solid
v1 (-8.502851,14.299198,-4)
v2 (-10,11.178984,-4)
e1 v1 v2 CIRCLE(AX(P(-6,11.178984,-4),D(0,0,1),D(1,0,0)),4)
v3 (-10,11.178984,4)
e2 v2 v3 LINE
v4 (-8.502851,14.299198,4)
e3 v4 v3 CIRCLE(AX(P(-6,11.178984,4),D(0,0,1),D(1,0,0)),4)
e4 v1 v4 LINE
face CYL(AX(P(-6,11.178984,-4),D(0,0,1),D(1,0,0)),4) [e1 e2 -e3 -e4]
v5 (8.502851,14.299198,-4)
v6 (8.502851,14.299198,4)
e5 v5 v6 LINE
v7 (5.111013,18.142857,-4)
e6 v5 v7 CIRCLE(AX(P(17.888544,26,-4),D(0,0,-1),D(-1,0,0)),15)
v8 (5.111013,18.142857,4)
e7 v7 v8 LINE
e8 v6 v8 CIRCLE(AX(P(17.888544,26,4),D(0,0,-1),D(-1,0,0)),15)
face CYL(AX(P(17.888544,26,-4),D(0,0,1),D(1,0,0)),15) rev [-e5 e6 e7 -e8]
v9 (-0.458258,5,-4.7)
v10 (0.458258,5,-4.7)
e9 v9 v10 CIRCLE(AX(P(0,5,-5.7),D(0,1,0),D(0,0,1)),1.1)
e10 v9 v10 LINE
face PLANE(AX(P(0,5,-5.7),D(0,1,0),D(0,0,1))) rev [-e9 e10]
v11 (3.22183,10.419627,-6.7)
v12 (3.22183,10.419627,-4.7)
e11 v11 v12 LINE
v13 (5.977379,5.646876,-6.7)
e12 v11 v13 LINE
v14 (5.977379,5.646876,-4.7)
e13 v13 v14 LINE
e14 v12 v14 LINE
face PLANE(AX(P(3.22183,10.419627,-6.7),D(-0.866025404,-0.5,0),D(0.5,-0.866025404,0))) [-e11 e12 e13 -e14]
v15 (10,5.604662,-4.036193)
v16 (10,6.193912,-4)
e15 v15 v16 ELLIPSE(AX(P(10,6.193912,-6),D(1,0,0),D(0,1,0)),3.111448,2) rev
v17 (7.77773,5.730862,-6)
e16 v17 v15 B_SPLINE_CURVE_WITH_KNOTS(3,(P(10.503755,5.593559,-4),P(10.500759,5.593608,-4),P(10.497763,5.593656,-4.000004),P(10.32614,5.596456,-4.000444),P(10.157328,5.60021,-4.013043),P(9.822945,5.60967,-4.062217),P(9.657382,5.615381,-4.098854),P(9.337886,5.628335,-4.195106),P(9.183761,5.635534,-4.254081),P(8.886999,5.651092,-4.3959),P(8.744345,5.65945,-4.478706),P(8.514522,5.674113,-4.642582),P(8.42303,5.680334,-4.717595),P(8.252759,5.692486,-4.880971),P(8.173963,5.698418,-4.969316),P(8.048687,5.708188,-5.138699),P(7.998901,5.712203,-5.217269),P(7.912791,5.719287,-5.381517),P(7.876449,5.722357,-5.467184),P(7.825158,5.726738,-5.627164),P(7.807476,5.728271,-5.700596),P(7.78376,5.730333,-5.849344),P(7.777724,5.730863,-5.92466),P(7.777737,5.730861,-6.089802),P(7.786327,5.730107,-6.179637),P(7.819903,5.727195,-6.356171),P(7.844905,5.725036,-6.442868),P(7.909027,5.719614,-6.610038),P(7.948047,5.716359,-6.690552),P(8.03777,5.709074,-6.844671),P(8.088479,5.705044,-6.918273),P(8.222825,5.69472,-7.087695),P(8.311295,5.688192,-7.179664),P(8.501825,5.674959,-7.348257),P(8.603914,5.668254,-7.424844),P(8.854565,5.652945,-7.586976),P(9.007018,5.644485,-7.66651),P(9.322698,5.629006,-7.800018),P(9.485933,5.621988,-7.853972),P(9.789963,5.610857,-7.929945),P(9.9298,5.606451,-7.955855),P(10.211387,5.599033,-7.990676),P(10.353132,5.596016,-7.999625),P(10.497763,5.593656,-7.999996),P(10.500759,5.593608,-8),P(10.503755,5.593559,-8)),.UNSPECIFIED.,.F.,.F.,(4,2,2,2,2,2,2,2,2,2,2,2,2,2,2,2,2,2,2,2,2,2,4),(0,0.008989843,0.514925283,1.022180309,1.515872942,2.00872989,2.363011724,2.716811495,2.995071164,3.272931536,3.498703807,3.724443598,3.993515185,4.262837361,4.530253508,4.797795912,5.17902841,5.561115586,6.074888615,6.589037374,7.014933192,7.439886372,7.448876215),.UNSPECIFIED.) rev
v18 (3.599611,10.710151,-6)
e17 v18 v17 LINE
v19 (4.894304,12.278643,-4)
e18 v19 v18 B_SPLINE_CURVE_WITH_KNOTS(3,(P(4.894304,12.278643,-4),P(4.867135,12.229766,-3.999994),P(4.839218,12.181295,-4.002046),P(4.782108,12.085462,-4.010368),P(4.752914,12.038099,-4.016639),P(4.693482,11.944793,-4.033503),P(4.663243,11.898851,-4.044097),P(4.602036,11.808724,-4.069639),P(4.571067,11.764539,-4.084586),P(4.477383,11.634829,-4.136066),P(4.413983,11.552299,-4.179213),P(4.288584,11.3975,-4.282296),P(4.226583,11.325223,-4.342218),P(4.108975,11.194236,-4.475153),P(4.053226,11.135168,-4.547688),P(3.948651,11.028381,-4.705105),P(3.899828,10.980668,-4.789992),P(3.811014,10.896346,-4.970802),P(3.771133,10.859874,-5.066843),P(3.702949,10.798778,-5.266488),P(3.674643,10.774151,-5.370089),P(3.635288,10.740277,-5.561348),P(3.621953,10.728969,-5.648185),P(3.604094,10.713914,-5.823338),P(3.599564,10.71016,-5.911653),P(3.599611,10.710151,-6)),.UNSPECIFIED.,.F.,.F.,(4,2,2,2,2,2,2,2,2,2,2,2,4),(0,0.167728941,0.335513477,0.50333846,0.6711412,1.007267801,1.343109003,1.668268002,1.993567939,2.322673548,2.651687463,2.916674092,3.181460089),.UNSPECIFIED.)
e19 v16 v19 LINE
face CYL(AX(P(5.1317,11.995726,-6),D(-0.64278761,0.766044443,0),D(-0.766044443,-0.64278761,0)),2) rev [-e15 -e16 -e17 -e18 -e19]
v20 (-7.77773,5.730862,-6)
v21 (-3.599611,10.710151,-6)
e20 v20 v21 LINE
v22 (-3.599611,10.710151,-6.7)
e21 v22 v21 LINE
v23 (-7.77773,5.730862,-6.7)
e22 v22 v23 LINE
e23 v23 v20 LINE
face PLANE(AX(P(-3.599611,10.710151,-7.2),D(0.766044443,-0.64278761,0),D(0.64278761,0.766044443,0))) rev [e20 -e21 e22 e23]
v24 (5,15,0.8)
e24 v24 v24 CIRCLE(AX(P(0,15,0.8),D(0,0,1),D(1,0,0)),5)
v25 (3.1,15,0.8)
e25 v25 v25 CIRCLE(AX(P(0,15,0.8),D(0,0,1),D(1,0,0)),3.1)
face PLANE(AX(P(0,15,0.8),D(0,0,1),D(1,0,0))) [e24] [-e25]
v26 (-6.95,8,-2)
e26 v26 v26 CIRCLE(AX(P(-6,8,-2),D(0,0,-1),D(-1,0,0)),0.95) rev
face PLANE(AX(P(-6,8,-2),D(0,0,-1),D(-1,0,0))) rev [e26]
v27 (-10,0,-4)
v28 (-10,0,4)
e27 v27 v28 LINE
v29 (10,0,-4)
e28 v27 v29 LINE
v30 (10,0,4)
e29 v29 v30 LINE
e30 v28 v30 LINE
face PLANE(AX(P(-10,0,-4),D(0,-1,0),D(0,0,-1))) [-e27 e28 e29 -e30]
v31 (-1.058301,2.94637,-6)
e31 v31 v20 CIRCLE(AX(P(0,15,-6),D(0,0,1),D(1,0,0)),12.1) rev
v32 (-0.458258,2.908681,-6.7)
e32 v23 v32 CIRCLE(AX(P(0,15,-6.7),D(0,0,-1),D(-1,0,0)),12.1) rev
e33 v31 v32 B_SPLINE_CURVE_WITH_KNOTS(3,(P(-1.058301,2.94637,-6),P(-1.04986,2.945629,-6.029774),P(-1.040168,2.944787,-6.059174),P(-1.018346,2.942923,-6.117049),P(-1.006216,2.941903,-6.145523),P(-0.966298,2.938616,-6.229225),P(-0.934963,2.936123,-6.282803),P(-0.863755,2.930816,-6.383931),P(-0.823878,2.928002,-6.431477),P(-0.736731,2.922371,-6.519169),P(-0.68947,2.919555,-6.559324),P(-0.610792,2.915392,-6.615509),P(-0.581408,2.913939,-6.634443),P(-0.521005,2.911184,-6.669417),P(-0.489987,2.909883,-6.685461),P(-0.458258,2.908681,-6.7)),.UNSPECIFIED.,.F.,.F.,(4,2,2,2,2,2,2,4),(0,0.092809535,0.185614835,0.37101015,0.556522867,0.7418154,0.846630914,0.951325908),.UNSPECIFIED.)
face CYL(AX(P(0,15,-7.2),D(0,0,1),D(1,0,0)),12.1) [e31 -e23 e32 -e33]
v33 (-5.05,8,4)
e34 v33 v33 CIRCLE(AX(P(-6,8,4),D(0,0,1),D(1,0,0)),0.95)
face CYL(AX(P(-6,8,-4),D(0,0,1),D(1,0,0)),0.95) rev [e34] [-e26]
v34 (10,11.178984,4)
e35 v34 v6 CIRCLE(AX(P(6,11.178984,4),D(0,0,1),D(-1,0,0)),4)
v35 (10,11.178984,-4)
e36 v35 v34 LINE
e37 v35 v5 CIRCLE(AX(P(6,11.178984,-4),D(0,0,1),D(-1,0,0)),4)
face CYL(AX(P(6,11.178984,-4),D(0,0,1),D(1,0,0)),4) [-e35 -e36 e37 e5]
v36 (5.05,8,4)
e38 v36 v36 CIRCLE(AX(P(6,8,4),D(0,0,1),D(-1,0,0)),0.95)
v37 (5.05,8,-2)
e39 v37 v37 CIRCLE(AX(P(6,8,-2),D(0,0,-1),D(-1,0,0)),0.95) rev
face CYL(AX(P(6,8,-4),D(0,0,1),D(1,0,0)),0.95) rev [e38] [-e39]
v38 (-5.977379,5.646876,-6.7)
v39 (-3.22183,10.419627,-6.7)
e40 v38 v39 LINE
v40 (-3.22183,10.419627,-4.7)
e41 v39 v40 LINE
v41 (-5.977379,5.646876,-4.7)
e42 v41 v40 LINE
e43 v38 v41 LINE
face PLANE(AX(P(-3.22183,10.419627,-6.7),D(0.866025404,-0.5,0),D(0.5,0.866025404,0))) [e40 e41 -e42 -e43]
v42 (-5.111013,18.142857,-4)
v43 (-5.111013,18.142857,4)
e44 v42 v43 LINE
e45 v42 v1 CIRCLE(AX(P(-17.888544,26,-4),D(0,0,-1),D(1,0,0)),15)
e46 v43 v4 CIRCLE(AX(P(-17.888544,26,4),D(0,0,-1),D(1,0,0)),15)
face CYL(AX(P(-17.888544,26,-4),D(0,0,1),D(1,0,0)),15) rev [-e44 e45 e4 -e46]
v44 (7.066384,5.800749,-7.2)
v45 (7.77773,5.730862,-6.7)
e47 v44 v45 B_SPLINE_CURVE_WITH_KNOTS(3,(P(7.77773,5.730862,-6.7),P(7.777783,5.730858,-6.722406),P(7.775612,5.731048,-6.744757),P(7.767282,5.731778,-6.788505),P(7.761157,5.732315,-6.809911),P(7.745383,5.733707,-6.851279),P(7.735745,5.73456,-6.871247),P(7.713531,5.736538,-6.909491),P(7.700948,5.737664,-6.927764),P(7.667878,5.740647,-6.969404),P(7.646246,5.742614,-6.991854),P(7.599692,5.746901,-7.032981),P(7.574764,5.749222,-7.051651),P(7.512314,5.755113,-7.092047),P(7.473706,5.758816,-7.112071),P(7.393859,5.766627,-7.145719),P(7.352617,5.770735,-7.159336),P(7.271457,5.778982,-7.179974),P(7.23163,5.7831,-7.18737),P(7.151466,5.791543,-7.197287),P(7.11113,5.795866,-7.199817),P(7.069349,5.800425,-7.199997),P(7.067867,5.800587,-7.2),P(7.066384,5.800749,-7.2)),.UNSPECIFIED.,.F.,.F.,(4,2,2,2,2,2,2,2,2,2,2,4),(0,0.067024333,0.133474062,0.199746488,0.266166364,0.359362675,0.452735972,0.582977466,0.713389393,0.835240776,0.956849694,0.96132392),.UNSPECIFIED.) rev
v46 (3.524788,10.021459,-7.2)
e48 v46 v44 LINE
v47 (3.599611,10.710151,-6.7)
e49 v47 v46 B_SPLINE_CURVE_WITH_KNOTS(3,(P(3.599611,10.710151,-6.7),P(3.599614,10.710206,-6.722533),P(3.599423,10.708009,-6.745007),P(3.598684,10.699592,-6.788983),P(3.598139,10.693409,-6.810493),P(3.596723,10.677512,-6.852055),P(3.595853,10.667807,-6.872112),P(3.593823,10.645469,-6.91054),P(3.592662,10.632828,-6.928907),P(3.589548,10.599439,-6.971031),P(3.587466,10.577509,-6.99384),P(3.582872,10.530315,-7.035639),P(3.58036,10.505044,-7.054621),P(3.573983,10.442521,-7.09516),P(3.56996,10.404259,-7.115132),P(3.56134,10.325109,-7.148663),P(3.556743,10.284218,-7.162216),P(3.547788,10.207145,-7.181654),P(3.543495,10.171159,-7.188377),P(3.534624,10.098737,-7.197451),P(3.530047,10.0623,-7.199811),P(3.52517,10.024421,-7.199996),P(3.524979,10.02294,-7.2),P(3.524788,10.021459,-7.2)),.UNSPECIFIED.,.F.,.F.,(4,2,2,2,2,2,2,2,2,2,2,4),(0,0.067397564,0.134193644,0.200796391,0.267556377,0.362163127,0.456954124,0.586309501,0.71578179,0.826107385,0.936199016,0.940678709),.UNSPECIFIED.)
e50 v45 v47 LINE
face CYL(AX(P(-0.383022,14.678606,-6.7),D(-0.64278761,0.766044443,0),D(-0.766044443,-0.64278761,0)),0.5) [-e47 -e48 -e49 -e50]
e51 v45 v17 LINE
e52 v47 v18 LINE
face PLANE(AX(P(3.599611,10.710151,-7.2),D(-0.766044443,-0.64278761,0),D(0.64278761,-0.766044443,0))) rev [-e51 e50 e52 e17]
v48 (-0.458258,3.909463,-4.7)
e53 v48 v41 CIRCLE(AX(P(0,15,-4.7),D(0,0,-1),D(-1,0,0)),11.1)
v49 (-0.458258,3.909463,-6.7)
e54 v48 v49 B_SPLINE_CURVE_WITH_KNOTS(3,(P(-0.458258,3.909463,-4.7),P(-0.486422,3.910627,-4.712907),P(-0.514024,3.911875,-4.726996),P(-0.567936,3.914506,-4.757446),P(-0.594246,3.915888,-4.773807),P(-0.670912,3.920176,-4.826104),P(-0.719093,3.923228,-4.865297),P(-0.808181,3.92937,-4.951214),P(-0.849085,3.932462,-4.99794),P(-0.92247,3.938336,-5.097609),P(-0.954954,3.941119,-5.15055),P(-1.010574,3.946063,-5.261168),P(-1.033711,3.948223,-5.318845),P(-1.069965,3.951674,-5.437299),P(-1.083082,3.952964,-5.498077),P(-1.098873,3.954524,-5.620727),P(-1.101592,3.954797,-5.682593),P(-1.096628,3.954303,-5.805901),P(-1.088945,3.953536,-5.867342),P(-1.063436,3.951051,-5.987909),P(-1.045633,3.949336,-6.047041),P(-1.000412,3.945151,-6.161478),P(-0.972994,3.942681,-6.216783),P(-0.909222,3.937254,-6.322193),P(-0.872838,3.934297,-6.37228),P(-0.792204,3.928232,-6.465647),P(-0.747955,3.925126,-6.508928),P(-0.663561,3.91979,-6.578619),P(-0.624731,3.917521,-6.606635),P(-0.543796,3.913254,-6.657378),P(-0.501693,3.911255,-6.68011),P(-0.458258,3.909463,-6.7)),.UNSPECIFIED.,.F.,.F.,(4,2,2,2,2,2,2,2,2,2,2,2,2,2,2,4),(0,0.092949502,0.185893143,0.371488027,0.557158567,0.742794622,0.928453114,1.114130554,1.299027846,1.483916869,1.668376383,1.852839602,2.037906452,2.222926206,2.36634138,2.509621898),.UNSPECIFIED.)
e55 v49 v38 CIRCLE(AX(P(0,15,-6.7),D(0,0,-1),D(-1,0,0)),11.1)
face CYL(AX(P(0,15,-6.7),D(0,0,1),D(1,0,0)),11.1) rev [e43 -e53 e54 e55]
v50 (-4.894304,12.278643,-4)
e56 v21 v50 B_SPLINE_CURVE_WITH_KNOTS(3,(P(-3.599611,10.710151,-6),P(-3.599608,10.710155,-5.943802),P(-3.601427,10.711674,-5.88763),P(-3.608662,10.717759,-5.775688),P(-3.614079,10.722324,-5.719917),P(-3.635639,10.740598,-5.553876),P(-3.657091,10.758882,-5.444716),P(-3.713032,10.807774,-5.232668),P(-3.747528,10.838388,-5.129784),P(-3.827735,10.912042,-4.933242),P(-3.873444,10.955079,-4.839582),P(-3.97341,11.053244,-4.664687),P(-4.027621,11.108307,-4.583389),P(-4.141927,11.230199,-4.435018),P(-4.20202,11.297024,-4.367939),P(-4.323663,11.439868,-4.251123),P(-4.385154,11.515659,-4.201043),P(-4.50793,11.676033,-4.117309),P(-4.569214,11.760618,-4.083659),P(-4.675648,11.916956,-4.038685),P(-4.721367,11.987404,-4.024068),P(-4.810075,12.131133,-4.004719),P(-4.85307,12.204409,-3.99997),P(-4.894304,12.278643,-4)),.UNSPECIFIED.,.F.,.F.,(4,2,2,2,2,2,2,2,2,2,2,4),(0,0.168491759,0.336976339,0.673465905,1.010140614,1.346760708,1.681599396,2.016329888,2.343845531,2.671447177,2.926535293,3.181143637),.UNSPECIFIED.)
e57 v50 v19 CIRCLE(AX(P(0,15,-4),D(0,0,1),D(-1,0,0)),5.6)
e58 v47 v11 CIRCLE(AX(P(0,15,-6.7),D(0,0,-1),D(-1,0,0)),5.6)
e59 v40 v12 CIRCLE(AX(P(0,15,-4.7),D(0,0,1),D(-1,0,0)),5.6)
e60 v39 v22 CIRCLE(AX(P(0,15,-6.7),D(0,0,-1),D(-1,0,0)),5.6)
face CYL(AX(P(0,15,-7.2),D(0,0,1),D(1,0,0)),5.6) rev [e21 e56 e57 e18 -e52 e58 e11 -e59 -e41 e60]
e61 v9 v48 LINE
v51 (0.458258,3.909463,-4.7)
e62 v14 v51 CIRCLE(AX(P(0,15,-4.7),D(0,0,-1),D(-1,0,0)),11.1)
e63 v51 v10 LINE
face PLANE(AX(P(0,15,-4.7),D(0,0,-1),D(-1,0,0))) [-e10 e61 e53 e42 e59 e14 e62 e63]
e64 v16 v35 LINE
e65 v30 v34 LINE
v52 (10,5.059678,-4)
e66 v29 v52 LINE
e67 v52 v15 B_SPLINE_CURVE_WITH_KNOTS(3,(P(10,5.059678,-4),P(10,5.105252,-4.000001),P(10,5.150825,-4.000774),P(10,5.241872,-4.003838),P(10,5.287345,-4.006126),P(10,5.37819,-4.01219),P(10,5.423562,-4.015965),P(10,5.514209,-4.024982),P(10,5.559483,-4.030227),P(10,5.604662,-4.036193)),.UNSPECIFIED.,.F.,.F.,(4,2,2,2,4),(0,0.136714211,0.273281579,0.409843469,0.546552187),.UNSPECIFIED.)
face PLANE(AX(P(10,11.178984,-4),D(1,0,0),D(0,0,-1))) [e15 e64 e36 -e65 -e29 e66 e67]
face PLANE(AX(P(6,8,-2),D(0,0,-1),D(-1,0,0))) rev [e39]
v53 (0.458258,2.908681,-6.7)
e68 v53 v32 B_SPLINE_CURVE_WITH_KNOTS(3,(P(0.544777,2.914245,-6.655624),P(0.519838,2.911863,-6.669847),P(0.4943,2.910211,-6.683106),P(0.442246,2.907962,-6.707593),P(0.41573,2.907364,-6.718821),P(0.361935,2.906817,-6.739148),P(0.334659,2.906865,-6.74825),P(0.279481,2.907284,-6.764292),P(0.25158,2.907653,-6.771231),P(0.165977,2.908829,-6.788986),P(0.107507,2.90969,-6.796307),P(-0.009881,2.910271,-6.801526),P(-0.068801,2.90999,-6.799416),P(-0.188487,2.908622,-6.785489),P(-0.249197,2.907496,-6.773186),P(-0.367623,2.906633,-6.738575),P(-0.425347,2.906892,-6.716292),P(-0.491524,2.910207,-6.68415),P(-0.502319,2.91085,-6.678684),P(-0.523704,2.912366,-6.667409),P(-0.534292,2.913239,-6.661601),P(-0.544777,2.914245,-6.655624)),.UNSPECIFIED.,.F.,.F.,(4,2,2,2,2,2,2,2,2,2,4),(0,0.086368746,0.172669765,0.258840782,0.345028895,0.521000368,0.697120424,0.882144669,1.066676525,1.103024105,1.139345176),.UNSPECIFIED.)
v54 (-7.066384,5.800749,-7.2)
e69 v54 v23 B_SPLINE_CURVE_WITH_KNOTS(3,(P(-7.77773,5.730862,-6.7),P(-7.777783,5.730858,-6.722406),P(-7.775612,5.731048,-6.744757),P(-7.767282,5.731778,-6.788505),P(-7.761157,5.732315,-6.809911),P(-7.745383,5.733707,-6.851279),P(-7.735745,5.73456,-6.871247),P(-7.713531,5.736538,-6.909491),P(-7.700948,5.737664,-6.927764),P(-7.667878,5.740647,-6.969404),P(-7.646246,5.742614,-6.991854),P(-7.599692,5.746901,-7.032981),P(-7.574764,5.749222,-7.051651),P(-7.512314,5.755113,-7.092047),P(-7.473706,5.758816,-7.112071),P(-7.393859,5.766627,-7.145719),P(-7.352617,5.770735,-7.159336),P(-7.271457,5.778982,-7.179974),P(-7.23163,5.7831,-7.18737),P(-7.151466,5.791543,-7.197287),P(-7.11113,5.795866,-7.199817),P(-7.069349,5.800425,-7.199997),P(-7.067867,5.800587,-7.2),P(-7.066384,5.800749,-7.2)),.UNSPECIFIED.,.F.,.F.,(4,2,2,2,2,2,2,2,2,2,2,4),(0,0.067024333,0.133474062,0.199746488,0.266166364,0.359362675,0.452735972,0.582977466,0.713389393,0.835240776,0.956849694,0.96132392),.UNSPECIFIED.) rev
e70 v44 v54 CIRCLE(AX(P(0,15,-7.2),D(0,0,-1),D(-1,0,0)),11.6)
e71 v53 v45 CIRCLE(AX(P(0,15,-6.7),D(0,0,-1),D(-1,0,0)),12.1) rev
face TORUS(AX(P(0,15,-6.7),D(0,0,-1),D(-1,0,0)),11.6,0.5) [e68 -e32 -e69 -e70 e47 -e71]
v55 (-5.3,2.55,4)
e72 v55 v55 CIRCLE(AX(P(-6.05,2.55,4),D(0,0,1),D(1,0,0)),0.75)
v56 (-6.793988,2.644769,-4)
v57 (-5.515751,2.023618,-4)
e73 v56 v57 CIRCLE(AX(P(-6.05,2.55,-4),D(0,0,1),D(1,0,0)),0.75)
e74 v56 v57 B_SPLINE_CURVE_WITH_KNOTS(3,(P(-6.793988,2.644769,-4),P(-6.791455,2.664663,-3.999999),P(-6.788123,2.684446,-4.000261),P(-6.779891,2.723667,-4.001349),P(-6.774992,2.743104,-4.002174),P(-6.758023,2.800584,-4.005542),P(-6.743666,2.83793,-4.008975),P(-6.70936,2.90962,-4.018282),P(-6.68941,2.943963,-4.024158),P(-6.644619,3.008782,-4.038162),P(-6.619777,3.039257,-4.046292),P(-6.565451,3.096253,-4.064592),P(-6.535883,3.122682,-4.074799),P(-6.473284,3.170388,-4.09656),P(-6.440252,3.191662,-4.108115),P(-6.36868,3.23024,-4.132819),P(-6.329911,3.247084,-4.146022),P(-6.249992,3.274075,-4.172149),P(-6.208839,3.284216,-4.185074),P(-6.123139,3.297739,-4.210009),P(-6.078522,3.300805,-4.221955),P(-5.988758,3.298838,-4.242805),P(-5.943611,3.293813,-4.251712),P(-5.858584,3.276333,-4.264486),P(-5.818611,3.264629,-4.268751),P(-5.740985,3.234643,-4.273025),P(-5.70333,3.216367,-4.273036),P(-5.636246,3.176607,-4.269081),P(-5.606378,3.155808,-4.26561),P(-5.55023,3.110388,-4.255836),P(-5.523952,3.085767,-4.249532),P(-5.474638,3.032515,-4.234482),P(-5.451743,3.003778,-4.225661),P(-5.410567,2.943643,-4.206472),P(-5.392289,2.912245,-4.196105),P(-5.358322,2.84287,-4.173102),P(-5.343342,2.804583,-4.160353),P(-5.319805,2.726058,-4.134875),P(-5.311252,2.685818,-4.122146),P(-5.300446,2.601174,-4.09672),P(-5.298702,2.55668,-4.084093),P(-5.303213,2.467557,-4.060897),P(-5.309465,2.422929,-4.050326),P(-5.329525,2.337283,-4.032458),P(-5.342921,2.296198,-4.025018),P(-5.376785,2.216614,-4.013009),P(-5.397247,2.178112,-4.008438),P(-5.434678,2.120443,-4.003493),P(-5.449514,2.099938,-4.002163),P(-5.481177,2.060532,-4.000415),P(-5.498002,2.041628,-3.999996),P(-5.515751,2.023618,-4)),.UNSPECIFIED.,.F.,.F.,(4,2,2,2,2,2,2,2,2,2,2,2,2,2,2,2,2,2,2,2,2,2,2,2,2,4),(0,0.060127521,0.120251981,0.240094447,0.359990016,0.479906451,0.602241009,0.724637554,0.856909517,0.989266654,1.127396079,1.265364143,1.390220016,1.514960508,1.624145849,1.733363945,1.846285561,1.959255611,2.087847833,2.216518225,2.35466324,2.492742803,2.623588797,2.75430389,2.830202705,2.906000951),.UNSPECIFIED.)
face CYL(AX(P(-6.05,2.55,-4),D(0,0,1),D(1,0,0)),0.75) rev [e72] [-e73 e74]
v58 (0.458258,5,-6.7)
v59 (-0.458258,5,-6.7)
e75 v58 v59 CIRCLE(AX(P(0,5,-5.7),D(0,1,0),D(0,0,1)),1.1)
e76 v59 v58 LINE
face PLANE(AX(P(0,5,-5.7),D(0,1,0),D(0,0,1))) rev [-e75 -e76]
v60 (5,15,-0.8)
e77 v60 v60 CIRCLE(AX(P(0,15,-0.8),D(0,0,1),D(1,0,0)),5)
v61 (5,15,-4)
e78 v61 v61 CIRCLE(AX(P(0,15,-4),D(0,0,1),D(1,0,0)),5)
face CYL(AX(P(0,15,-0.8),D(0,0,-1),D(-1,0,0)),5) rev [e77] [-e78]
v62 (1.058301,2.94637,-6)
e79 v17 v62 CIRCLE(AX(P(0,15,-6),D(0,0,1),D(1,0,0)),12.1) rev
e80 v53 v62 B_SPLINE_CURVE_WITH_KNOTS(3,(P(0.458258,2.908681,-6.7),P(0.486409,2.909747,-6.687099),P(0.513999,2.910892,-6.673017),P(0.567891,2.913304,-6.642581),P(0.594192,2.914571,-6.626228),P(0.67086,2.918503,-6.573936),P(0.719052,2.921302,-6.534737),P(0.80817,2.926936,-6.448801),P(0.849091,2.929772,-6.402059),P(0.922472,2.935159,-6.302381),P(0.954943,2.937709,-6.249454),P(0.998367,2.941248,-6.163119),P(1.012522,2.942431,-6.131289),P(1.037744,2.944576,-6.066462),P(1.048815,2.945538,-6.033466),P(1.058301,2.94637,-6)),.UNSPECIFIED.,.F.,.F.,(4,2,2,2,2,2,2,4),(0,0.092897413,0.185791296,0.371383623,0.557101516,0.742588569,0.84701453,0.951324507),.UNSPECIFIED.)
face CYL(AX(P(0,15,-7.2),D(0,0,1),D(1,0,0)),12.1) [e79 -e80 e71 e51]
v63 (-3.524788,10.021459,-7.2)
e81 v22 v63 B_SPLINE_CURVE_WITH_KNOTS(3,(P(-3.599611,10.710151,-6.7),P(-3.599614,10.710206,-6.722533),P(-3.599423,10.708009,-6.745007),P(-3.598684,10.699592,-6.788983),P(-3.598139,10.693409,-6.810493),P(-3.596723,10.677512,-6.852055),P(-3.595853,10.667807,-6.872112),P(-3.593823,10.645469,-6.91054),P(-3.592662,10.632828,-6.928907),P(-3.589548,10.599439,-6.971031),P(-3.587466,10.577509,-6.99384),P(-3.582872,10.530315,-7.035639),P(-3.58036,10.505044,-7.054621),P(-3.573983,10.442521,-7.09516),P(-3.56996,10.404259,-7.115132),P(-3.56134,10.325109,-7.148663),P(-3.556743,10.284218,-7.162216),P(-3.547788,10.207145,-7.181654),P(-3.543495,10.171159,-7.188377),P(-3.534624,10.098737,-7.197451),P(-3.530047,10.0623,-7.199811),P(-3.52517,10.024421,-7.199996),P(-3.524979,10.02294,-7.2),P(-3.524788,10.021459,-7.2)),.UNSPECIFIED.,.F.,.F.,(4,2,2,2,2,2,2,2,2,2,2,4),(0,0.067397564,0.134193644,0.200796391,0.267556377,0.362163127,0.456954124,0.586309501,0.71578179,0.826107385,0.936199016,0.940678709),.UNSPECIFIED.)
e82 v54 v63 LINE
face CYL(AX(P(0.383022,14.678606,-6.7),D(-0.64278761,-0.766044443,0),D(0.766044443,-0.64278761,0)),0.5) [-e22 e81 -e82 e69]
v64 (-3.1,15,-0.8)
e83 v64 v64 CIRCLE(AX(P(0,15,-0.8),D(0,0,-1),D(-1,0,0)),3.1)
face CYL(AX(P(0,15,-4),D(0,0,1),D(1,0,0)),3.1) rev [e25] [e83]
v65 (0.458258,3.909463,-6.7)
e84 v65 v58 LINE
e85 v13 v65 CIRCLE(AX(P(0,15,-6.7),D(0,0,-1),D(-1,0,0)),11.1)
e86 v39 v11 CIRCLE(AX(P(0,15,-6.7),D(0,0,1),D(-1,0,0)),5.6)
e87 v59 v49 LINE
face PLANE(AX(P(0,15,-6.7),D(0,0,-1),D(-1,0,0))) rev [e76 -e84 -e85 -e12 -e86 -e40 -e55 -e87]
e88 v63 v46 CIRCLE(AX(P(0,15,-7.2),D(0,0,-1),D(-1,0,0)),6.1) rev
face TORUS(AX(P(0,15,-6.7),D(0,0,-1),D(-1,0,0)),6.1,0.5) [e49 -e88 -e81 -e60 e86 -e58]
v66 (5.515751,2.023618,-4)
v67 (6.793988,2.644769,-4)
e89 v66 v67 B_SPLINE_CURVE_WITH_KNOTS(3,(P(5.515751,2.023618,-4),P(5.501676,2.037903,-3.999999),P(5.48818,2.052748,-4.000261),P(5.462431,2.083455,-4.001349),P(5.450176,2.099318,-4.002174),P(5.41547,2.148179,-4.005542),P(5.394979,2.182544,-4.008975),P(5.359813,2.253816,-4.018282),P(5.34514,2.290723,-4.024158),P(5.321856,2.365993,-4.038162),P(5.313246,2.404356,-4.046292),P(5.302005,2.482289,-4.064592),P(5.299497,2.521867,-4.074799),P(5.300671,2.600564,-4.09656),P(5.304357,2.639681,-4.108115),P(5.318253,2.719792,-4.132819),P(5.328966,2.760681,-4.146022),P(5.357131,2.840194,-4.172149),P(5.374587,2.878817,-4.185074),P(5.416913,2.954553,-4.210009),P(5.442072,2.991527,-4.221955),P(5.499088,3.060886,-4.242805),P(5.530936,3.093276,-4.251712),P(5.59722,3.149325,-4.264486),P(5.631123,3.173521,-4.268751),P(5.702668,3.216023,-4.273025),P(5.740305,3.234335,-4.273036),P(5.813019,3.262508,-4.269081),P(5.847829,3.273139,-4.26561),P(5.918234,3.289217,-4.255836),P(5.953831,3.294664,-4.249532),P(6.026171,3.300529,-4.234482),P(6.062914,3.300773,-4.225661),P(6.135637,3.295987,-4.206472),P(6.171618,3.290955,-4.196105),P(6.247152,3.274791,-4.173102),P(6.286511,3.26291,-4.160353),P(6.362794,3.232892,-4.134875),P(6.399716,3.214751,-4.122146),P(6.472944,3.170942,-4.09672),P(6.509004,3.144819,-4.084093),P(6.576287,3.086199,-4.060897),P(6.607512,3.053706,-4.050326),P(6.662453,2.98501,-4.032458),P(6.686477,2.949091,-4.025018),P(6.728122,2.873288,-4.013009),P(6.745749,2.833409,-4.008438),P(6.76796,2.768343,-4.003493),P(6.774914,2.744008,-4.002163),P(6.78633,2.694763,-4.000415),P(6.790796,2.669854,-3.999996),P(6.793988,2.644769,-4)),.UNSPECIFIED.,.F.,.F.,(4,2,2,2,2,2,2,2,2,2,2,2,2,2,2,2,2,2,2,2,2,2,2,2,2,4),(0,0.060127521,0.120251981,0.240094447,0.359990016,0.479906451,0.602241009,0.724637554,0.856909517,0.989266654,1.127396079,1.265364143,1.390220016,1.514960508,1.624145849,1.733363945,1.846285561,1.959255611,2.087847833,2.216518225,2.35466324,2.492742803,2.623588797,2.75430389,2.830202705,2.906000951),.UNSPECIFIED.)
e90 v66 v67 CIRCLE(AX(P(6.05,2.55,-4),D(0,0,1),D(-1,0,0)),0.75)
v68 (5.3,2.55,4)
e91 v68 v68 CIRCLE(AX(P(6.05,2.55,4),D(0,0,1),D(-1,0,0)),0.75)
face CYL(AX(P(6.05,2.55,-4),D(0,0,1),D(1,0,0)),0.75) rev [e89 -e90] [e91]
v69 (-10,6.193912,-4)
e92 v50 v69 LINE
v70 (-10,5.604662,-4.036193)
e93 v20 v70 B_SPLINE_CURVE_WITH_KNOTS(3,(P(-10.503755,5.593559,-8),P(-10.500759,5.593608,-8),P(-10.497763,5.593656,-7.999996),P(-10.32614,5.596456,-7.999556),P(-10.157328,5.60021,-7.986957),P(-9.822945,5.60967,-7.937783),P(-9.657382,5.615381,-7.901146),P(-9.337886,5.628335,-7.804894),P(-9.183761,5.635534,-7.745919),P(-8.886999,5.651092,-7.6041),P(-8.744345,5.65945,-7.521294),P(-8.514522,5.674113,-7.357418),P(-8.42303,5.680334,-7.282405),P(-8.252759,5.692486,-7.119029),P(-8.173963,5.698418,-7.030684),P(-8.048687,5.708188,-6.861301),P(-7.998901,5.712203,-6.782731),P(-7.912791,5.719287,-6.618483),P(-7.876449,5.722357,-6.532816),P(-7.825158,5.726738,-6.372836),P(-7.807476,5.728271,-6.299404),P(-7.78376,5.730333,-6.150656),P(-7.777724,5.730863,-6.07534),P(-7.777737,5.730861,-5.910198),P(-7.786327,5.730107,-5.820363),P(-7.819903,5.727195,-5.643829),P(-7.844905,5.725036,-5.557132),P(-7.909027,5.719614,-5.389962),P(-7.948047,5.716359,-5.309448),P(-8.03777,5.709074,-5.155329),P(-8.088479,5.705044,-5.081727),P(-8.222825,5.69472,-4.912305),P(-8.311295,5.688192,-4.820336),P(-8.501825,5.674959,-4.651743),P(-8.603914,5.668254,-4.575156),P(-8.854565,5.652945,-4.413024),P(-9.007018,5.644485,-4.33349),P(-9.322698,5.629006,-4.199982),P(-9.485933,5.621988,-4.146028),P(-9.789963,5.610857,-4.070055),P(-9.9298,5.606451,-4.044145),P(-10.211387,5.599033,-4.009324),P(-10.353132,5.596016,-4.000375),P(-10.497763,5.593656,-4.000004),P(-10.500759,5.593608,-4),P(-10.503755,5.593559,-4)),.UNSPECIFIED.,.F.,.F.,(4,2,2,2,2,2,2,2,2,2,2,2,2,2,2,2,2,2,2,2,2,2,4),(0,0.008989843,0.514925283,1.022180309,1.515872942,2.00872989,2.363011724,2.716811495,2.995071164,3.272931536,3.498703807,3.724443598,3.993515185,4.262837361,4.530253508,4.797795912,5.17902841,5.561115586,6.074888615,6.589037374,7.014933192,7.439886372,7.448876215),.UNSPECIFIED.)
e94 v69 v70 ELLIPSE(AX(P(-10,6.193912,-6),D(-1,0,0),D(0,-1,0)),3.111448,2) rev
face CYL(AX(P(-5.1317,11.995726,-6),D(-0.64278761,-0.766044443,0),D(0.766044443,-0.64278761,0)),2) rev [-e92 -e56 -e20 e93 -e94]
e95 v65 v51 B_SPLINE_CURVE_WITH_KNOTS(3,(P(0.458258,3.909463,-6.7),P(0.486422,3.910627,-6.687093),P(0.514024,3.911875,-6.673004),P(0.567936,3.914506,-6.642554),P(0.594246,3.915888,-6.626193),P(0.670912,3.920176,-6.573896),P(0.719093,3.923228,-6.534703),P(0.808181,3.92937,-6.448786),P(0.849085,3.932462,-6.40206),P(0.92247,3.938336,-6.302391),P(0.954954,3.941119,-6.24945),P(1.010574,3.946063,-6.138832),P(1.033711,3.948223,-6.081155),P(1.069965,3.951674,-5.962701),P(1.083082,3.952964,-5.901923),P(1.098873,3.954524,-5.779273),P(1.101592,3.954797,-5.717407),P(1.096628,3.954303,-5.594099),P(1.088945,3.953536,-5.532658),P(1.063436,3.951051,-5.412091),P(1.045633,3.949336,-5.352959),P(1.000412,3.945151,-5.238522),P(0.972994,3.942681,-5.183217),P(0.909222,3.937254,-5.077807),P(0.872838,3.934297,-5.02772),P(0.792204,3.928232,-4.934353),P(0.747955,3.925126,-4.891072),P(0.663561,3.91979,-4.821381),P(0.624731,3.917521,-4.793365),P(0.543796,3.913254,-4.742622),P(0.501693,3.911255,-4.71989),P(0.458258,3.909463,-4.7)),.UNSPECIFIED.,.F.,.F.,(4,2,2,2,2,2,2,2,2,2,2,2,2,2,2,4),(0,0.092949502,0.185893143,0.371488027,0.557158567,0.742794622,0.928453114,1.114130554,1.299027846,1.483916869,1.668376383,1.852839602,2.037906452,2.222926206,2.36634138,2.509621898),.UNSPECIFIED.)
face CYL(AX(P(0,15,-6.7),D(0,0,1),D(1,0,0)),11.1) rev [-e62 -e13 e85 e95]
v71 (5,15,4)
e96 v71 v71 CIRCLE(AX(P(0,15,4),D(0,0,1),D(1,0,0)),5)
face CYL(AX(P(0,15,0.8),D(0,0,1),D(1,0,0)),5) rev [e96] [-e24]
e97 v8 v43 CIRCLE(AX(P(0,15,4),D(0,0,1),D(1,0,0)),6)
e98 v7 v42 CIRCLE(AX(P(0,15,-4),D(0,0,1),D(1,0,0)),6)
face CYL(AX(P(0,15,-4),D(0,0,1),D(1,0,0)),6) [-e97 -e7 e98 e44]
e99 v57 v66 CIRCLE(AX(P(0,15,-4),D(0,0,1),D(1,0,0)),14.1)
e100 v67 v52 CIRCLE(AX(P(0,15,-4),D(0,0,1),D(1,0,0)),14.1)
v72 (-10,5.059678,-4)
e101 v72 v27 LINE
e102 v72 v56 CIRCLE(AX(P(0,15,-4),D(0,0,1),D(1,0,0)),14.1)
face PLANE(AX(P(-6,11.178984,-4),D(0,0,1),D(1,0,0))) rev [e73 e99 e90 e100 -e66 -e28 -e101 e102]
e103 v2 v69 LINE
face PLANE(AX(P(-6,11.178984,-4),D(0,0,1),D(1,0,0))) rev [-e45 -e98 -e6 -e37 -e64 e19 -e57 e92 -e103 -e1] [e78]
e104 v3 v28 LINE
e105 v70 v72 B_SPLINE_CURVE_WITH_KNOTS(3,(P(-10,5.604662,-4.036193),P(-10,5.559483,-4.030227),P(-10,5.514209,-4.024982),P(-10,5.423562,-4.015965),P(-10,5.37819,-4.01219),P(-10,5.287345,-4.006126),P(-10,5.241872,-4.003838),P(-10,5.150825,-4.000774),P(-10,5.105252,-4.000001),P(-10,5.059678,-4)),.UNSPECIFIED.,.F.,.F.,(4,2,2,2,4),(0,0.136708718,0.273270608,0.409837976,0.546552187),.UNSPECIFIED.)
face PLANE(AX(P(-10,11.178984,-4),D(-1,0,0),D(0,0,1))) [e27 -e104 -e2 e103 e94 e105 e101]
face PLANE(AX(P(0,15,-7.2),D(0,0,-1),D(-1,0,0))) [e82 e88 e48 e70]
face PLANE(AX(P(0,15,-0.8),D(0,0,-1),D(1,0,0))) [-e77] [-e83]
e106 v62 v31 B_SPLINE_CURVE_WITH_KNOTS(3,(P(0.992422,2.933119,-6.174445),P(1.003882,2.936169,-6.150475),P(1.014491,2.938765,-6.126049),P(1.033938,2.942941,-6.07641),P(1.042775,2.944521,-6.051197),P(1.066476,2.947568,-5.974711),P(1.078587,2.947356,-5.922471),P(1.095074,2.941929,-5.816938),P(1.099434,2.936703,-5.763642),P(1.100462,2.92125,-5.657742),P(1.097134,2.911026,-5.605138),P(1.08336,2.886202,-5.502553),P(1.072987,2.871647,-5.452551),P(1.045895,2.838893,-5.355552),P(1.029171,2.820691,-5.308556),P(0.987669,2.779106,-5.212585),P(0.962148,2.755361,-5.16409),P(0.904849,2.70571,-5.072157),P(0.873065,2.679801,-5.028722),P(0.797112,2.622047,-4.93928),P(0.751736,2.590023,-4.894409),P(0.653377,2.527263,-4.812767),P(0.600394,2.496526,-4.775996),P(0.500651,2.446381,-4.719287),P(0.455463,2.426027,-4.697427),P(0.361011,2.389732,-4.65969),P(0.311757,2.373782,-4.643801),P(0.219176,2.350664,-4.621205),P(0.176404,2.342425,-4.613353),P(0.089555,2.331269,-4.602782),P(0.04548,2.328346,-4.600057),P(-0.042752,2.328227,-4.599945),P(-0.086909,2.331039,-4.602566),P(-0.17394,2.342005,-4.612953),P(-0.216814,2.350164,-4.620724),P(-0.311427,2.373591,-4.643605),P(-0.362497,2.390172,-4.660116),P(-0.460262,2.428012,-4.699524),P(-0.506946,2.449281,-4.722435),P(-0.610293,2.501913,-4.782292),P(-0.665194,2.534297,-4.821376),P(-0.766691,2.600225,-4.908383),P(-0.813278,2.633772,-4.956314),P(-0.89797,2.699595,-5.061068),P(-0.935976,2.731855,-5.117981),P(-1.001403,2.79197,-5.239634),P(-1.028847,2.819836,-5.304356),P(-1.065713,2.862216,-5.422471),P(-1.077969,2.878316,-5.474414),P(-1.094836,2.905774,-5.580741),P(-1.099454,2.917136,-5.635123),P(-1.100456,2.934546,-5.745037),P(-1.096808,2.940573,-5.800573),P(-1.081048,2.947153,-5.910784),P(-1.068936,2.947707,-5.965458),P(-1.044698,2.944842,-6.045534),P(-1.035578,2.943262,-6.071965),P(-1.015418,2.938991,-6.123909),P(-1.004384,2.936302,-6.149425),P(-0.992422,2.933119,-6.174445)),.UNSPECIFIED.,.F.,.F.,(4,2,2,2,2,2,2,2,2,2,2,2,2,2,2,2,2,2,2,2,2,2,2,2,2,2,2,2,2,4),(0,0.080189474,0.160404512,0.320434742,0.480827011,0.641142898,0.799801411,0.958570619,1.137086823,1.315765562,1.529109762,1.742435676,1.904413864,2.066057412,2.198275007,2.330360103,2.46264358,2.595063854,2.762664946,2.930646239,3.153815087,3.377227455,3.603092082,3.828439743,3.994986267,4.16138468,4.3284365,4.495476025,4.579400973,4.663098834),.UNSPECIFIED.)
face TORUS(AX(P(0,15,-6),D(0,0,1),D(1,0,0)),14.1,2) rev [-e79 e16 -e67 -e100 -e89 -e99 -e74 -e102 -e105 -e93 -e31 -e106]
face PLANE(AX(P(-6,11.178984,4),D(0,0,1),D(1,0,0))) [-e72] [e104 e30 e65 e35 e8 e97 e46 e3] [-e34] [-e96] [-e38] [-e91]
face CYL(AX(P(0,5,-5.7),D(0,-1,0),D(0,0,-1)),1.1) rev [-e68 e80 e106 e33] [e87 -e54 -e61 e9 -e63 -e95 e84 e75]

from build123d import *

# Parameters (mm, degrees)
EXTRUDE_1_DEPTH          = 4
EXTRUDE_1_DEPTH_BACK     = 4
SKETCH_2_R               = 0.95
SKETCH_2_R_2             = 0.75
SKETCH_3_R               = 5
CUT_EXTRUDE_1_DEPTH      = 3.2
SKETCH_6_R               = 3.1
CUT_EXTRUDE_2_DEPTH      = 24.749526311
EXTRUDE_3_DEPTH          = 3.2
CUT_EXTRUDE_3_DEPTH      = 1.2
CUT_EXTRUDE_3_DEPTH_BACK = 0.8
SKETCH_10_R              = 0.95
EXTRUDE_4_DEPTH          = 2
FILLET_4_R               = 2
FILLET_START             = -7
FILLET_5_2_DEPTH         = 9
FILLET_START_2           = -2
FILLET_5_3_DEPTH         = 9
SKETCH_11_R              = 1.1
CUT_EXTRUDE_4_DEPTH      = 5


with BuildPart() as part:
    # 草图2 → 凸台-拉伸1 (new, two sides: drawn at the far end of the back side and taken through both)
    with BuildSketch(Plane.XY.offset(-EXTRUDE_1_DEPTH_BACK)):
        with BuildLine():
            Line((-10, 11.178983643), (-10, 0))
            Line((-10, 0), (10, 0))
            Line((10, 0), (10, 11.178983643))
            ThreePointArc((10, 11.178983643), (9.606342006, 12.909387452), (8.502851331, 14.299197613))
            ThreePointArc((8.502851331, 14.299197613), (6.641519688, 16.075059286), (5.11101252, 18.142857143))
            ThreePointArc((5.11101252, 18.142857143), (0, 21), (-5.11101252, 18.142857143))
            ThreePointArc((-5.11101252, 18.142857143), (-6.641519688, 16.075059286), (-8.502851331, 14.299197613))
            ThreePointArc((-8.502851331, 14.299197613), (-9.606342006, 12.909387452), (-10, 11.178983643))
        make_face()
        with Locations((-6, 8)):
            Circle(SKETCH_2_R, mode=Mode.SUBTRACT)
        with Locations((-6.05, 2.55)):
            Circle(SKETCH_2_R_2, mode=Mode.SUBTRACT)
        with Locations(Location((6.05, 2.55, 0), (0, 0, 180))):
            Circle(SKETCH_2_R_2, mode=Mode.SUBTRACT)
        with Locations(Location((6, 8, 0), (0, 0, 180))):
            Circle(SKETCH_2_R, mode=Mode.SUBTRACT)
    extrude(amount=EXTRUDE_1_DEPTH + EXTRUDE_1_DEPTH_BACK)

    # 草图3 → 切除-拉伸1 (cut)
    with BuildSketch(Plane.XY.offset(4)):
        with Locations((0, 15)):
            Circle(SKETCH_3_R)
    cut_extrude_1 = extrude(amount=-CUT_EXTRUDE_1_DEPTH, mode=Mode.SUBTRACT)

    # 镜向1: 切除-拉伸1 across plane
    add(cut_extrude_1.mirror(Plane.XY), mode=Mode.SUBTRACT)

    # 草图6 → 切除-拉伸2 (cut, through all)
    with BuildSketch(Plane.XY.offset(0.8)):
        with Locations((0, 15)):
            Circle(SKETCH_6_R)
    extrude(amount=-CUT_EXTRUDE_2_DEPTH, mode=Mode.SUBTRACT)

    # 草图8 → 凸台-拉伸3 (add)
    with BuildSketch(Plane(origin=(0, 0, -4), x_dir=(-1, 0, 0), z_dir=(0, 0, -1))):
        with BuildLine():
            Line((-3.599610614, 10.710151119), (-7.777730077, 5.730862238))
            ThreePointArc((-7.777730077, 5.730862238), (0, 2.9), (7.777730077, 5.730862238))
            Line((7.777730077, 5.730862238), (3.599610614, 10.710151119))
            ThreePointArc((3.599610614, 10.710151119), (0, 9.4), (-3.599610614, 10.710151119))
        make_face()
    extrude(amount=EXTRUDE_3_DEPTH)

    # 草图9 → 切除-拉伸3 (cut, two sides: drawn at the far end of the back side and taken through both)
    with BuildSketch(Plane(origin=(0, 0, -5.5), x_dir=(-1, 0, 0), z_dir=(0, 0, -1)).offset(-CUT_EXTRUDE_3_DEPTH_BACK)):
        with BuildLine():
            Line((-3.221829655, 10.419627344), (-5.977379212, 5.646875508))
            ThreePointArc((-5.977379212, 5.646875508), (0, 3.9), (5.977379212, 5.646875508))
            Line((5.977379212, 5.646875508), (3.221829655, 10.419627344))
            ThreePointArc((3.221829655, 10.419627344), (0, 9.4), (-3.221829655, 10.419627344))
        make_face()
    extrude(amount=CUT_EXTRUDE_3_DEPTH + CUT_EXTRUDE_3_DEPTH_BACK, mode=Mode.SUBTRACT)

    # 草图10 → 凸台-拉伸4 (add)
    with BuildSketch(Plane(origin=(0, 0, -4), x_dir=(-1, 0, 0), z_dir=(0, 0, -1))):
        with Locations((-6, 8)):
            Circle(SKETCH_10_R)
        with Locations(Location((6, 8, 0), (0, 0, 180))):
            Circle(SKETCH_10_R)
    extrude(amount=-EXTRUDE_4_DEPTH)

    # 圆角4
    # the kernel refuses this fillet: 2 mm, written as the material it adds along each edge
    with BuildSketch(Plane(origin=(10.991668126, 1.900640023, -4), x_dir=(0.7660444431189769, 0.6427876096865407, 0), z_dir=(-0.6427876096865407, 0.7660444431189769, 0))) as fillet_4_piece_1_section:
        with BuildLine():
            CenterArc((FILLET_4_R, FILLET_4_R), FILLET_4_R, 180, 90)
            Line((0, FILLET_4_R), (0, 0))
            Line((0, 0), (FILLET_4_R, 0))
        make_face()
    fillet_4_piece_1 = extrude(amount=16.5, mode=Mode.PRIVATE)
    fillet_4_piece_1 = fillet_4_piece_1 - Plane(origin=(0, 15, -4), x_dir=(-0.6427876096865404, -0.7660444431189772, 0), z_dir=(0, 0, 1)) * Cylinder(5.6, 42, mode=Mode.PRIVATE)
    fillet_4_piece_1 = fillet_4_piece_1 & Plane(origin=(0, 15, -4), x_dir=(0.6427876096865403, -0.7660444431189773, 0), z_dir=(0, 0, 1)) * Cylinder(12.1, 42, mode=Mode.PRIVATE)
    add(fillet_4_piece_1)
    with BuildSketch(Plane(origin=(-0.385672566, 14.540373334, -4), x_dir=(-0.766044443118977, 0.6427876096865406, 0), z_dir=(-0.6427876096865406, -0.7660444431189771, 0))) as fillet_4_piece_2_section:
        with BuildLine():
            CenterArc((FILLET_4_R, FILLET_4_R), FILLET_4_R, 180, 90)
            Line((0, FILLET_4_R), (0, 0))
            Line((0, 0), (FILLET_4_R, 0))
        make_face()
    fillet_4_piece_2 = extrude(amount=16.5, mode=Mode.PRIVATE)
    fillet_4_piece_2 = fillet_4_piece_2 - Plane(origin=(0, 15, -4), x_dir=(-0.6427876096865404, -0.7660444431189772, 0), z_dir=(0, 0, 1)) * Cylinder(5.6, 42, mode=Mode.PRIVATE)
    fillet_4_piece_2 = fillet_4_piece_2 & Plane(origin=(0, 15, -4), x_dir=(0.6427876096865403, -0.7660444431189773, 0), z_dir=(0, 0, 1)) * Cylinder(12.1, 42, mode=Mode.PRIVATE)
    add(fillet_4_piece_2)
    with BuildSketch(Plane(origin=(0, 15, -4), x_dir=(0.6427876096865403, -0.7660444431189772, 0), z_dir=(0.7660444431189772, 0.6427876096865403, 0))) as fillet_4_piece_3_section:
        with BuildLine():
            CenterArc((12.1 + FILLET_4_R, FILLET_4_R), FILLET_4_R, 180, 90)
            Line((12.1, FILLET_4_R), (12.1, 0))
            Line((12.1, 0), (12.1 + FILLET_4_R, 0))
        make_face()
    fillet_4_piece_3 = revolve(axis=Axis((0, 15, -4), (0, 0, -1)), revolution_arc=80, mode=Mode.PRIVATE)
    fillet_4_piece_3 = fillet_4_piece_3 - Plane(origin=(-6.05, 2.55, -4), x_dir=(1, 0, 0), z_dir=(0, 0, -1)) * Cylinder(0.75, 57, mode=Mode.PRIVATE)
    fillet_4_piece_3 = fillet_4_piece_3 - Plane(origin=(6.05, 2.55, -4), x_dir=(-1, 0, 0), z_dir=(0, 0, -1)) * Cylinder(0.75, 57, mode=Mode.PRIVATE)
    add(fillet_4_piece_3)
    with BuildSketch(Plane(origin=(10.991668126, 1.900640023, -4), x_dir=(0.7660444431189769, 0.6427876096865407, 0), z_dir=(-0.6427876096865407, 0.7660444431189769, 0))) as fillet_4_piece_4a_section:
        with BuildLine():
            CenterArc((FILLET_4_R, FILLET_4_R), FILLET_4_R, 180, 90)
            Line((0, FILLET_4_R), (0, 0))
            Line((0, 0), (FILLET_4_R, 0))
        make_face()
    fillet_4_piece_4a = extrude(amount=16.5, mode=Mode.PRIVATE)
    fillet_4_piece_4a = split(fillet_4_piece_4a, bisect_by=Plane(origin=(10, 1.900640023, -4), z_dir=(-1, 0, 0)), keep=Keep.TOP, mode=Mode.PRIVATE)
    fillet_4_piece_4a = fillet_4_piece_4a - Plane(origin=(0, 15, -4), x_dir=(0.6427876096865403, -0.7660444431189773, 0), z_dir=(0, 0, 1)) * Cylinder(12.1, 42, mode=Mode.PRIVATE)
    with BuildSketch(Plane(origin=(0, 15, -4), x_dir=(0.8963584591585163, -0.44333002683663375, 0), z_dir=(0.44333002683663375, 0.8963584591585163, 0))) as fillet_4_piece_4b_section:
        with BuildLine():
            CenterArc((12.1 + FILLET_4_R, FILLET_4_R), FILLET_4_R, 180, 90)
            Line((12.1, FILLET_4_R), (12.1, 0))
            Line((12.1, 0), (12.1 + FILLET_4_R, 0))
        make_face()
    fillet_4_piece_4b = revolve(axis=Axis((0, 15, -4), (0, 0, -1)), revolution_arc=103.683456225, mode=Mode.PRIVATE)
    fillet_4_piece_4b = split(fillet_4_piece_4b, bisect_by=Plane(origin=(10, 15, -4), z_dir=(-1, 0, 0)), keep=Keep.TOP, mode=Mode.PRIVATE)
    fillet_4_piece_4b = split(fillet_4_piece_4b, bisect_by=Plane(origin=(0, 15, -4), z_dir=(0.7660444431189771, 0.6427876096865406, 0)), keep=Keep.TOP, mode=Mode.PRIVATE)
    fillet_4_piece_4 = fillet_4_piece_4a & fillet_4_piece_4b
    add(fillet_4_piece_4)
    with BuildSketch(Plane(origin=(-0.385672566, 14.540373334, -4), x_dir=(-0.766044443118977, 0.6427876096865406, 0), z_dir=(-0.6427876096865406, -0.7660444431189771, 0))) as fillet_4_piece_5a_section:
        with BuildLine():
            CenterArc((FILLET_4_R, FILLET_4_R), FILLET_4_R, 180, 90)
            Line((0, FILLET_4_R), (0, 0))
            Line((0, 0), (FILLET_4_R, 0))
        make_face()
    fillet_4_piece_5a = extrude(amount=16.5, mode=Mode.PRIVATE)
    fillet_4_piece_5a = split(fillet_4_piece_5a, bisect_by=Plane(origin=(-10, 14.540373334, -4), z_dir=(1, 0, 0)), keep=Keep.TOP, mode=Mode.PRIVATE)
    fillet_4_piece_5a = fillet_4_piece_5a - Plane(origin=(0, 15, -4), x_dir=(0.6427876096865403, -0.7660444431189773, 0), z_dir=(0, 0, 1)) * Cylinder(12.1, 42, mode=Mode.PRIVATE)
    with BuildSketch(Plane(origin=(0, 15, -4), x_dir=(0.6427876096865403, -0.7660444431189772, 0), z_dir=(0.7660444431189772, 0.6427876096865403, 0))) as fillet_4_piece_5b_section:
        with BuildLine():
            CenterArc((12.1 + FILLET_4_R, FILLET_4_R), FILLET_4_R, 180, 90)
            Line((12.1, FILLET_4_R), (12.1, 0))
            Line((12.1, 0), (12.1 + FILLET_4_R, 0))
        make_face()
    fillet_4_piece_5b = revolve(axis=Axis((0, 15, -4), (0, 0, -1)), revolution_arc=103.683456225, mode=Mode.PRIVATE)
    fillet_4_piece_5b = split(fillet_4_piece_5b, bisect_by=Plane(origin=(-10, 15, -4), z_dir=(1, 0, 0)), keep=Keep.TOP, mode=Mode.PRIVATE)
    fillet_4_piece_5b = split(fillet_4_piece_5b, bisect_by=Plane(origin=(0, 15, -4), z_dir=(-0.7660444431189771, 0.6427876096865406, 0)), keep=Keep.TOP, mode=Mode.PRIVATE)
    fillet_4_piece_5 = fillet_4_piece_5a & fillet_4_piece_5b
    add(fillet_4_piece_5)

    # 圆角5: read off the stored shape, not the designer's step
    # 圆角5 outline → 圆角5 (revolve, cut)
    with BuildSketch(Plane.XZ.offset(-15)):
        with BuildLine():
            Line((12.1, -7.2), (12.1, -6.7))
            ThreePointArc((12.1, -6.7), (11.953553391, -7.053553391), (11.6, -7.2))
            Line((11.6, -7.2), (12.1, -7.2))
        make_face()
        with BuildLine():
            Line((5.6, -7.2), (6.1, -7.2))
            ThreePointArc((6.1, -7.2), (5.746446609, -7.053553391), (5.6, -6.7))
            Line((5.6, -6.7), (5.6, -7.2))
        make_face()
    revolve(axis=Axis((0, 15, 0), (0, 0, 1)), mode=Mode.SUBTRACT)

    # Fillet 5 2 outline → Fillet 5 2 (cut)
    with BuildSketch(Plane(origin=(0, 0, 0), x_dir=(0.7660444431189767, 0.6427876096865409, 0), z_dir=(0.6427876096865409, -0.7660444431189768, 0)).offset(FILLET_START)):
        with BuildLine():
            Line((9.641814145, -7.2), (9.641814145, -6.7))
            ThreePointArc((9.641814145, -6.7), (9.495367536, -7.053553391), (9.141814145, -7.2))
            Line((9.141814145, -7.2), (9.641814145, -7.2))
        make_face()
    extrude(amount=FILLET_5_2_DEPTH, mode=Mode.SUBTRACT)

    # Fillet 5 3 outline → Fillet 5 3 (cut)
    with BuildSketch(Plane(origin=(0, 0, 0), x_dir=(0.7660444431189767, -0.6427876096865409, 0), z_dir=(0.6427876096865409, 0.7660444431189768, 0)).offset(FILLET_START_2)):
        with BuildLine():
            Line((-9.641814145, 7.2), (-9.641814145, 6.7))
            ThreePointArc((-9.641814145, 6.7), (-9.495367536, 7.053553391), (-9.141814145, 7.2))
            Line((-9.141814145, 7.2), (-9.641814145, 7.2))
        make_face()
    extrude(amount=FILLET_5_3_DEPTH, mode=Mode.SUBTRACT)

    # 草图11 → 切除-拉伸4 (cut)
    with BuildSketch(Plane(origin=(0, 0, 0), x_dir=(1, 0, 0), z_dir=(0, 1, 0))):
        with Locations(Location((0, 5.7, 0), (0, 0, 65.380022671))):
            Circle(SKETCH_11_R)
    extrude(amount=CUT_EXTRUDE_4_DEPTH, mode=Mode.SUBTRACT)


solid = part.part
